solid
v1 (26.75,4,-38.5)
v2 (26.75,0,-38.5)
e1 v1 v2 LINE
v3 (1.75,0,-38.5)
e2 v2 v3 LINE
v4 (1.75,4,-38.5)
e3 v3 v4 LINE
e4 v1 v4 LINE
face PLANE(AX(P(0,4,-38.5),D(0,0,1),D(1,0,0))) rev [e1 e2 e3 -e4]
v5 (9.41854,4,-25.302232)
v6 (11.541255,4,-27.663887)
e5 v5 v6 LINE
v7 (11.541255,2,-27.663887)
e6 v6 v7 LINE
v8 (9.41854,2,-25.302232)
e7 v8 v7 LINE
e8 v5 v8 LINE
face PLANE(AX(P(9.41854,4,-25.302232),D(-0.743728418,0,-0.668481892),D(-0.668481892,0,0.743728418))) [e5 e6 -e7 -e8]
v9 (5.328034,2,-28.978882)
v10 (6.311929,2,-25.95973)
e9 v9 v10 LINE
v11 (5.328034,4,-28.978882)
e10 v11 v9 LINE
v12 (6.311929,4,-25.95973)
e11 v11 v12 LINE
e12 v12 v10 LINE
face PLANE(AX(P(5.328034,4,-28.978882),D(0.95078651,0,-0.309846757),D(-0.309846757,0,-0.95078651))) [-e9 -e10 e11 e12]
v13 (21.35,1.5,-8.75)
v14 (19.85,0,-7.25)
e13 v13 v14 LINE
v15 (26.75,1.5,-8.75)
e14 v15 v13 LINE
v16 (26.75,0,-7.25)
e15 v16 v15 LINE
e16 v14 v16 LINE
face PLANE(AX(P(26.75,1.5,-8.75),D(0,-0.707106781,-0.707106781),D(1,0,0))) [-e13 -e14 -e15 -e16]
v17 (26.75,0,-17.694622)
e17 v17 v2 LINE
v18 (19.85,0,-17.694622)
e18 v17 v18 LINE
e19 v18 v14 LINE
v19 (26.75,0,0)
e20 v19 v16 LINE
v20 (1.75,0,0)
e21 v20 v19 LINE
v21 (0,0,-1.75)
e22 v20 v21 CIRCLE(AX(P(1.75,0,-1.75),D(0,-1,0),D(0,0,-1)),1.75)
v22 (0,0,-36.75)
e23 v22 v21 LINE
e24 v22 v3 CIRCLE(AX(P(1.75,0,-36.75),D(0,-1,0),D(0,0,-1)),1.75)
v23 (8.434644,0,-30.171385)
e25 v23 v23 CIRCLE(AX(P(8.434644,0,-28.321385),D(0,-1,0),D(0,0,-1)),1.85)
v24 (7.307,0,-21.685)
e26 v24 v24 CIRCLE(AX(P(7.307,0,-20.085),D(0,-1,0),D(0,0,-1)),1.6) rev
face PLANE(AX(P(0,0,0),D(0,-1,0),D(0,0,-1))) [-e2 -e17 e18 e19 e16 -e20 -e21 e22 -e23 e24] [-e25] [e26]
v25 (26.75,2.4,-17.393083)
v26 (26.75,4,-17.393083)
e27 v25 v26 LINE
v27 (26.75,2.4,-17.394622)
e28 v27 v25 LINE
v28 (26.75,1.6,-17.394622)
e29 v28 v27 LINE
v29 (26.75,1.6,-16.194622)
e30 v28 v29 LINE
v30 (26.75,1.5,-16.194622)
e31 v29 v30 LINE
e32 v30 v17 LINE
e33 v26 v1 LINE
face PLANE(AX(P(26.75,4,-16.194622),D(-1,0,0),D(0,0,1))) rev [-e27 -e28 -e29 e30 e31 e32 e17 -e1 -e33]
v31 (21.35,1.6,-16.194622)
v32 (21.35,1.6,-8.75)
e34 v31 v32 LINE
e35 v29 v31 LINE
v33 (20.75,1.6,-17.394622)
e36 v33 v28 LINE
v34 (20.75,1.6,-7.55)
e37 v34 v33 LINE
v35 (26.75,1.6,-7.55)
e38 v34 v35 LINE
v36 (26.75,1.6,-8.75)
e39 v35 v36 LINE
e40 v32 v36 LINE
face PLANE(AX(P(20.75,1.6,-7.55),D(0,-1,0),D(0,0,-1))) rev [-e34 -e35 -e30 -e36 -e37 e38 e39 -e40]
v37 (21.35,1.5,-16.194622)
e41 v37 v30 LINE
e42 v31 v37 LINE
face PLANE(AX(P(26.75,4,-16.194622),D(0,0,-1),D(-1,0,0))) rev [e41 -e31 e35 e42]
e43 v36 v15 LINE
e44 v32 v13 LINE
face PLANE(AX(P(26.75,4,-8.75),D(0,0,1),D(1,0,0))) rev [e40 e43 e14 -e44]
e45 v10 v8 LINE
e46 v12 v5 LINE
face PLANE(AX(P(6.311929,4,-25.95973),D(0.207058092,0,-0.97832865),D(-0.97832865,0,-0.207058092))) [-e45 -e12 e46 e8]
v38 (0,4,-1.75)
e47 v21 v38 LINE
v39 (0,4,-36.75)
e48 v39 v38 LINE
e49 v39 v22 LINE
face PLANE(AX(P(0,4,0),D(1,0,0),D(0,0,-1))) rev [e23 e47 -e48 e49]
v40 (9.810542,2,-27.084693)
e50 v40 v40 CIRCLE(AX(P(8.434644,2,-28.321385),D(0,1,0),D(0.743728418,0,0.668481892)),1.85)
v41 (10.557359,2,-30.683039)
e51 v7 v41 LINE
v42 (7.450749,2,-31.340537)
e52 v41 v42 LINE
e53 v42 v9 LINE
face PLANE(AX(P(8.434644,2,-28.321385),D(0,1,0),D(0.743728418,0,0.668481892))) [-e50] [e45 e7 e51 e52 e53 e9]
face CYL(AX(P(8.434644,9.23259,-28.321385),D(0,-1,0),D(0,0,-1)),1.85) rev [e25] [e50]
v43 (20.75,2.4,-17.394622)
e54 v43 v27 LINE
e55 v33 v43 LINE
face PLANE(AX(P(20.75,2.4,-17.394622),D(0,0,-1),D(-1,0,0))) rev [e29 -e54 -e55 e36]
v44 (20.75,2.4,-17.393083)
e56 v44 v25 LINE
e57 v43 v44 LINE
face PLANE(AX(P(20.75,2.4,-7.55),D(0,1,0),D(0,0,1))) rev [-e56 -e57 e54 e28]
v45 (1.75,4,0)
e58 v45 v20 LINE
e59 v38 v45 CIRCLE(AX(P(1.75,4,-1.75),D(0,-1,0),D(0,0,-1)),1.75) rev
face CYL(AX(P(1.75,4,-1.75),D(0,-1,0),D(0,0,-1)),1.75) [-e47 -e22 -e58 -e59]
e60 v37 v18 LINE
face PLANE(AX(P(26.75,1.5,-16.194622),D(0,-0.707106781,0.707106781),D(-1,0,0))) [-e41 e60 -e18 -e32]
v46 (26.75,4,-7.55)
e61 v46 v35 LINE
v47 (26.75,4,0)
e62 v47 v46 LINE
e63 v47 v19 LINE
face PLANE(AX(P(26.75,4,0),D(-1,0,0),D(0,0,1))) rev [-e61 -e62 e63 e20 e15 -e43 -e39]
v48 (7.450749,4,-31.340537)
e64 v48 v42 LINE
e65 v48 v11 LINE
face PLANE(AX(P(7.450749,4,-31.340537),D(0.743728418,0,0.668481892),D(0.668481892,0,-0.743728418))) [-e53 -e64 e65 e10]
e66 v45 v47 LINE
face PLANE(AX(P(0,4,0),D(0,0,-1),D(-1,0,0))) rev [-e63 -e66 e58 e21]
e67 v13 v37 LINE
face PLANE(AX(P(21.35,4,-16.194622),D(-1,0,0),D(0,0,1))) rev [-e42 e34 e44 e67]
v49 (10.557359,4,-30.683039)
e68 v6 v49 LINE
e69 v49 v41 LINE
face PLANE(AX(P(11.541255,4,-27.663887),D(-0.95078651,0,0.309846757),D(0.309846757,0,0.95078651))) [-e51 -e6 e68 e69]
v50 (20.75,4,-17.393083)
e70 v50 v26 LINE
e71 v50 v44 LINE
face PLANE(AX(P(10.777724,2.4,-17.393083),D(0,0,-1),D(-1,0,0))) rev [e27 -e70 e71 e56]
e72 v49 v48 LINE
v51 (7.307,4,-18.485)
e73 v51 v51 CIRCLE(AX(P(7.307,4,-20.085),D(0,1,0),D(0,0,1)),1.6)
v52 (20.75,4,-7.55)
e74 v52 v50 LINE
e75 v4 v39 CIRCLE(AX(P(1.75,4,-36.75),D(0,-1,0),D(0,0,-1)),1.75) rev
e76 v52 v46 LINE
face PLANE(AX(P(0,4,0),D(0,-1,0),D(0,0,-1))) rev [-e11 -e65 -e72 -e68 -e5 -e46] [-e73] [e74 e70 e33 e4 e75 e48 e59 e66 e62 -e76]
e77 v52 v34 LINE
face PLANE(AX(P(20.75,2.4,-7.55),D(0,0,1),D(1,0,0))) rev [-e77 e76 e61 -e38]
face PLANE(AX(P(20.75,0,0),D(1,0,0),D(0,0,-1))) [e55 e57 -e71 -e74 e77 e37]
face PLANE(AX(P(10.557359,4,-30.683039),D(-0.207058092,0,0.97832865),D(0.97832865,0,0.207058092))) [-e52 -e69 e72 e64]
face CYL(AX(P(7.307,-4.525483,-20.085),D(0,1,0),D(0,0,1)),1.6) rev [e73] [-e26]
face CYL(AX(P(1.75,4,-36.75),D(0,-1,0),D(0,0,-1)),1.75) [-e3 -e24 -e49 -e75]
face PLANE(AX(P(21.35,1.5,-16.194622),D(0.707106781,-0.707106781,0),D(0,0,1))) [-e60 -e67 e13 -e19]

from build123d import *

# Parameters (mm, degrees)
BOSS_EXTRUDE1_DEPTH = 4
SKETCH2_W           = 9.844621866
SKETCH2_H           = 0.8
CUT_EXTRUDE1_DEPTH  = 6
SKETCH3_W           = 9.843082996
SKETCH3_H           = 1.6
CUT_EXTRUDE2_DEPTH  = 6
SKETCH5_R           = 1.6
CUT_EXTRUDE4_DEPTH  = 4
FILLET1_R           = 1.75
SKETCH10_R          = 1.85
CUT_EXTRUDE7_DEPTH  = 4
CAVITY2_START       = 2
CAVITY2_OUTLINE_R   = 1.85
CAVITY2_DEPTH       = 3


with BuildPart() as part:
    # Sketch1 → Boss-Extrude1 (new body)
    with BuildSketch(Plane(origin=(0, 0, 0), x_dir=(1, 0, 0), z_dir=(0, 1, 0))):
        Polygon((26.75, 16.194621866), (26.75, 38.5), (0, 38.5), (0, 0), (26.75, 0), (26.75, 8.75), (21.35, 8.75), (21.35, 16.194621866), align=None)
    extrude(amount=BOSS_EXTRUDE1_DEPTH)

    # Sketch2 → Cut-Extrude1 (cut)
    with BuildSketch(Plane(origin=(26.75, 0, 0), x_dir=(0, 0, -1), z_dir=(1, 0, 0))):
        with Locations((12.472310933, 2)):
            Rectangle(SKETCH2_W, SKETCH2_H)
    extrude(amount=-CUT_EXTRUDE1_DEPTH, mode=Mode.SUBTRACT)

    # Sketch3 → Cut-Extrude2 (cut)
    with BuildSketch(Plane(origin=(26.75, 0, 0), x_dir=(0, 0, -1), z_dir=(1, 0, 0))):
        with Locations((12.471541498, 3.2)):
            Rectangle(SKETCH3_W, SKETCH3_H)
    extrude(amount=-CUT_EXTRUDE2_DEPTH, mode=Mode.SUBTRACT)

    # Sketch5 → Cut-Extrude4 (cut)
    with BuildSketch(Plane(origin=(0, 4, 0), x_dir=(1, 0, 0), z_dir=(0, 1, 0))):
        with Locations(Location((7.307, 20.085, 0), (0, 0, 270))):
            Circle(SKETCH5_R)
    extrude(amount=-CUT_EXTRUDE4_DEPTH, mode=Mode.SUBTRACT)

    # Chamfer1: read off the stored shape, not the designer's step
    # Chamfer1: loft between two sections, ruled curve by curve
    chamfer1_from = [
        Edge.make_line((21.35, 1.5, -16.194621866), (21.35, 1.5, -8.75)),
        Edge.make_line((21.35, 1.5, -8.75), (26.75, 1.5, -8.75)),
        Edge.make_line((21.35, 1.5, -16.194621866), (26.75, 1.5, -16.194621866)),
        Edge.make_line((26.75, 1.5, -16.194621866), (26.75, 1.5, -8.75)),
    ]
    chamfer1_to = [
        Edge.make_line((19.85, 0, -17.694621866), (19.85, 0, -7.25)),
        Edge.make_line((19.85, 0, -7.25), (26.75, 0, -7.25)),
        Edge.make_line((19.85, 0, -17.694621866), (26.75, 0, -17.694621866)),
        Edge.make_line((26.75, 0, -17.694621866), (26.75, 0, -7.25)),
    ]
    chamfer1 = Solid(Shell([*[Face.make_surface_from_curves(chamfer1_from[k], chamfer1_to[k]) for k in range(4)], Face(Wire(chamfer1_from)), Face(Wire(chamfer1_to))]))
    add(chamfer1, mode=Mode.SUBTRACT)

    # Fillet1
    fillet1_edges = [part.edges().sort_by_distance(p)[0] for p in [
        (0, 2, -38.5),
        (0, 2, 0),
    ]]
    fillet(fillet1_edges, radius=FILLET1_R)

    # Sketch10 → Cut-Extrude7 (cut)
    with BuildSketch(Plane(origin=(0, 0, 0), x_dir=(-1, 0, 0), z_dir=(0, -1, 0))):
        with Locations(Location((-8.434644349, 28.321384576, 0), (0, 0, 90))):
            Circle(SKETCH10_R)
    extrude(amount=-CUT_EXTRUDE7_DEPTH, mode=Mode.SUBTRACT)

    # Cavity2: read off the stored shape, not the designer's step
    # Cavity2 outline → Cavity2 (cut)
    with BuildSketch(Plane(origin=(0, 0, 0), x_dir=(1, 0, 0), z_dir=(0, 1, 0)).offset(CAVITY2_START)):
        Polygon((11.54125505, 27.663886828), (10.557359451, 30.683039489), (7.450748751, 31.340537236), (5.328033648, 28.978882323), (6.311929246, 25.959729663), (9.418539947, 25.302231916), align=None)
        with Locations((8.434644349, 28.321384576)):
            Circle(CAVITY2_OUTLINE_R, mode=Mode.SUBTRACT)
    extrude(amount=CAVITY2_DEPTH, mode=Mode.SUBTRACT)


solid = part.part
